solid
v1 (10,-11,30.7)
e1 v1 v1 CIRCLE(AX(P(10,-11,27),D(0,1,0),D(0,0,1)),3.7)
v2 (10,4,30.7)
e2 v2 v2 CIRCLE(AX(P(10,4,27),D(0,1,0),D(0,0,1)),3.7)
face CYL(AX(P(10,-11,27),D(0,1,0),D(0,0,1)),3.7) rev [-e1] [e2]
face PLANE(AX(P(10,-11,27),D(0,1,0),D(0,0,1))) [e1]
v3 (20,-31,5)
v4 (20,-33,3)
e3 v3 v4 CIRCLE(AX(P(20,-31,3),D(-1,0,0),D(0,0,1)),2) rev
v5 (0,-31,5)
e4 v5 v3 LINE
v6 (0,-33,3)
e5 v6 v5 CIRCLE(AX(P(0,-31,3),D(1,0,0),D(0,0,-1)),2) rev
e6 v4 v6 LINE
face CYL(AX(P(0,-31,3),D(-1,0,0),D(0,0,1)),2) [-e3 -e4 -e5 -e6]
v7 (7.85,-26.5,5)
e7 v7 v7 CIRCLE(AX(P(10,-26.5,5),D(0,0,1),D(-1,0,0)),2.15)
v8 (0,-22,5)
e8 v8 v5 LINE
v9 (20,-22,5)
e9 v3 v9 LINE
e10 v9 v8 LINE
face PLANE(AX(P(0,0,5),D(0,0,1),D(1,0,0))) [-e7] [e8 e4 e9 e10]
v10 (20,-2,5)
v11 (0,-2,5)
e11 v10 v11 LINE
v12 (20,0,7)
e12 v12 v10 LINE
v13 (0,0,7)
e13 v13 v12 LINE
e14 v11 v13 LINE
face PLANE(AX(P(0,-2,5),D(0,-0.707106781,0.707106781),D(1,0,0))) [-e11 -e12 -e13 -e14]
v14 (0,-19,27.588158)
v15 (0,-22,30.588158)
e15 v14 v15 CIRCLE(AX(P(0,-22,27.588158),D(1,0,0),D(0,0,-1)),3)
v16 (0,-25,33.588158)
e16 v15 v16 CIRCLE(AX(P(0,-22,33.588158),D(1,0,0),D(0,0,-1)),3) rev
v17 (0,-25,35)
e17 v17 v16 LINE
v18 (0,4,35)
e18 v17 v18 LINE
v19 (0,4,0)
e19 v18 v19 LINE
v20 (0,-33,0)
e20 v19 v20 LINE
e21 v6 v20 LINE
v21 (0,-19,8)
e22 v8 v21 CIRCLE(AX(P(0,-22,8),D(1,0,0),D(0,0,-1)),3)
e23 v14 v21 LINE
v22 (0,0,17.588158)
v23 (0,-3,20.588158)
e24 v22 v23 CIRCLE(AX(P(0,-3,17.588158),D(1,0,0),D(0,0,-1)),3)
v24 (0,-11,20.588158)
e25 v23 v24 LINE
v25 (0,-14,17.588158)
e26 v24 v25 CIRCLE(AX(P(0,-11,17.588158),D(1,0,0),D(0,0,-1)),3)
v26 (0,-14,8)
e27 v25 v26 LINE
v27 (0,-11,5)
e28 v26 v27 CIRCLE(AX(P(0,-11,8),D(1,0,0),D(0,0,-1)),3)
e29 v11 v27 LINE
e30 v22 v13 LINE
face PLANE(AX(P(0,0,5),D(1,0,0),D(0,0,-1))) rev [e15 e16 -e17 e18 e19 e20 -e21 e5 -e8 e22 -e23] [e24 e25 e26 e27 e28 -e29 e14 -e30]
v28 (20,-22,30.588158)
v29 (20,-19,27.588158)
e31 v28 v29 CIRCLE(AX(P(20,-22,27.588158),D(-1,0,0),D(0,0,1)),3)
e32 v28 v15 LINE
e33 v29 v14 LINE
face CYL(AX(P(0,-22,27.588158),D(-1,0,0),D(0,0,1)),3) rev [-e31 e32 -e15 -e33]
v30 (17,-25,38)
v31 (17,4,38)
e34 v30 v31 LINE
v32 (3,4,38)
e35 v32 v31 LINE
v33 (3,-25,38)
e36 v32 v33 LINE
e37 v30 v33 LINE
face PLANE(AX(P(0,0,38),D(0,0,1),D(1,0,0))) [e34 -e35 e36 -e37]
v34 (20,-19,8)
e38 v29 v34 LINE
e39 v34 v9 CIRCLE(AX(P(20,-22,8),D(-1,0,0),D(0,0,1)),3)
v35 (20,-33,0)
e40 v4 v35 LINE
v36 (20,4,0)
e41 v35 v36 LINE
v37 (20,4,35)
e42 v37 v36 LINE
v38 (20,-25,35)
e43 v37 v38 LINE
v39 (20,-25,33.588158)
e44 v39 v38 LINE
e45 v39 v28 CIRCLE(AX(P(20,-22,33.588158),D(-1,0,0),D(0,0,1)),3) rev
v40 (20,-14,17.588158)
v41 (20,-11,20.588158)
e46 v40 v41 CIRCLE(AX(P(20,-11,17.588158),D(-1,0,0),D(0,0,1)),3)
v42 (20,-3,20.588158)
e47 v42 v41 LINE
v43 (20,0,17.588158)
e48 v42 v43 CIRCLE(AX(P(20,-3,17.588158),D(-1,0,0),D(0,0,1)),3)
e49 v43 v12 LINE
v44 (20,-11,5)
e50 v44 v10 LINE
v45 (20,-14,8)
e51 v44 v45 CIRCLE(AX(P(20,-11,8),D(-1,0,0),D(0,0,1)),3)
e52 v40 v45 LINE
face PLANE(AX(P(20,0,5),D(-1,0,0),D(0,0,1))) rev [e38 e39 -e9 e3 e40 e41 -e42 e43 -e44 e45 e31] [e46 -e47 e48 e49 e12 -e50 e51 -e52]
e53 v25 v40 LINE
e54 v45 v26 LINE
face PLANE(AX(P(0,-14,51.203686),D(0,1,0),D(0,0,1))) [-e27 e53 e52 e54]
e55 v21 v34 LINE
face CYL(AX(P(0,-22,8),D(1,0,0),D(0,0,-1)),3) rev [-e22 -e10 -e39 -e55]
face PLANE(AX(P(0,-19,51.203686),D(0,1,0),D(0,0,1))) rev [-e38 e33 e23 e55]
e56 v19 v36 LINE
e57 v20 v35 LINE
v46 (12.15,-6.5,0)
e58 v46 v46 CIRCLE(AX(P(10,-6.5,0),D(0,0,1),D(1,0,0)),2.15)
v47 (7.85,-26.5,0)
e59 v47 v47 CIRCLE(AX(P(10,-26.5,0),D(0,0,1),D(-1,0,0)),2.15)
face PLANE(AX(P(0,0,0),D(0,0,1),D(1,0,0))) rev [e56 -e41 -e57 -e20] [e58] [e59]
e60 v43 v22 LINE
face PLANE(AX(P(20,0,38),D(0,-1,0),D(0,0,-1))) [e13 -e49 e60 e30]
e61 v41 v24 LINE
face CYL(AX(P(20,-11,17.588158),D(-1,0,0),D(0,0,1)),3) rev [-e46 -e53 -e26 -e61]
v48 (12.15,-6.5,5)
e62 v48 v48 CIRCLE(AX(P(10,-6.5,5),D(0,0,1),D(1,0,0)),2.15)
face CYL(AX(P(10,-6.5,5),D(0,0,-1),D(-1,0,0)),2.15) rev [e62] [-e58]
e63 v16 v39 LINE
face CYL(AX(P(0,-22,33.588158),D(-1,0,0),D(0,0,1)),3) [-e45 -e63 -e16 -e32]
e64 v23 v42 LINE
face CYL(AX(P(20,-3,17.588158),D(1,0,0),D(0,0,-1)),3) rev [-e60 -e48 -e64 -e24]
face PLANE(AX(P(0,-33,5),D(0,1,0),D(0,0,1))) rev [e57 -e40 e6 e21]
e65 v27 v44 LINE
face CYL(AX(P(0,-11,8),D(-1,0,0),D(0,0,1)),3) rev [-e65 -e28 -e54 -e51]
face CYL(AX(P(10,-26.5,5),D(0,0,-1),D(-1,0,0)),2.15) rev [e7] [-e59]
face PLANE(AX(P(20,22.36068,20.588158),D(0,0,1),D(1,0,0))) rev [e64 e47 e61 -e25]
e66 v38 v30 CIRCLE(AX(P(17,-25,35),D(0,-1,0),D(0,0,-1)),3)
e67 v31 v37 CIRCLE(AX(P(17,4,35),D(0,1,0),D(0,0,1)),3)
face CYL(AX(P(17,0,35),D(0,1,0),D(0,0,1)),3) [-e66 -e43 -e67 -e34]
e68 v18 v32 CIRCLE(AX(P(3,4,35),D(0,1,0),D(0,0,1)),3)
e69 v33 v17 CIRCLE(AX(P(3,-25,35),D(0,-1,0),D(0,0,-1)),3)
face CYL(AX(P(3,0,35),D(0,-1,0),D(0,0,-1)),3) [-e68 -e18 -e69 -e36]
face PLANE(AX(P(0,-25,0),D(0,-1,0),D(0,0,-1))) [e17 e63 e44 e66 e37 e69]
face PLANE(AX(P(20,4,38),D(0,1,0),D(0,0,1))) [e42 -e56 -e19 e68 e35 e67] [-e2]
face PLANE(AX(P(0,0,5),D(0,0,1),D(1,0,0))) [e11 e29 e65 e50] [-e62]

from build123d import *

# Parameters (mm, degrees)
SKETCH1_W           = 20
SKETCH1_H           = 33
SKETCH1_R           = 2.15
BOSS_EXTRUDE1_DEPTH = 5
SKETCH2_W           = 20
SKETCH2_H           = 4
BOSS_EXTRUDE2_DEPTH = 38
SKETCH4_W           = 20
SKETCH4_H           = 7.411842069
BOSS_EXTRUDE3_DEPTH = 25
FILLET1_R           = 3
FILLET2_R           = 2
FILLET4_R           = 3
CHAMFER2_SIZE       = 2
SKETCH8_W           = 20
SKETCH8_H           = 5
BOSS_EXTRUDE5_DEPTH = 25.588157931
FILLET7_R           = 3
SKETCH12_W          = 20
SKETCH12_H          = 10
BOSS_EXTRUDE6_DEPTH = 14
SKETCH3_R           = 3.7
CUT_EXTRUDE2_DEPTH  = 15
FILLET8_R           = 3


with BuildPart() as part:
    # Sketch1 → Boss-Extrude1 (new body)
    with BuildSketch(Plane.XY):
        with Locations((10, -16.5)):
            Rectangle(SKETCH1_W, SKETCH1_H)
        with Locations((10, -6.5)):
            Circle(SKETCH1_R, mode=Mode.SUBTRACT)
        with Locations(Location((10, -26.5, 0), (0, 0, 180))):
            Circle(SKETCH1_R, mode=Mode.SUBTRACT)
    extrude(amount=BOSS_EXTRUDE1_DEPTH)

    # Sketch2 → Boss-Extrude2 (add)
    with BuildSketch(Plane(origin=(0, 0, 0), x_dir=(-1, 0, 0), z_dir=(0, 0, -1))):
        with Locations((-10, 2)):
            Rectangle(SKETCH2_W, SKETCH2_H)
    extrude(amount=-BOSS_EXTRUDE2_DEPTH)

    # Sketch4 → Boss-Extrude3 (add)
    with BuildSketch(Plane.XZ):
        with Locations((10, 34.294078965)):
            Rectangle(SKETCH4_W, SKETCH4_H)
    extrude(amount=BOSS_EXTRUDE3_DEPTH)

    # Fillet1
    fillet1_edges = [part.edges().sort_by_distance(p)[0] for p in [
        (20, -10.5, 38),
        (0, -10.5, 38),
    ]]
    fillet(fillet1_edges, radius=FILLET1_R)

    # Fillet2
    fillet2_edges = [part.edges().sort_by_distance(p)[0] for p in [
        (10, -33, 5),
    ]]
    fillet(fillet2_edges, radius=FILLET2_R)

    # Fillet4
    fillet4_edges = [part.edges().sort_by_distance(p)[0] for p in [
        (10, -25, 30.588157931),
    ]]
    fillet(fillet4_edges, radius=FILLET4_R)

    # Chamfer2
    chamfer2_edges = [part.edges().sort_by_distance(p)[0] for p in [
        (10, 0, 5),
    ]]
    chamfer(chamfer2_edges, length=CHAMFER2_SIZE)

    # Sketch8 → Boss-Extrude5 (add)
    with BuildSketch(Plane.XY.offset(5)):
        with Locations((10, -16.5)):
            Rectangle(SKETCH8_W, SKETCH8_H)
    extrude(amount=BOSS_EXTRUDE5_DEPTH)

    # Fillet7
    fillet7_edges = [part.edges().sort_by_distance(p)[0] for p in [
        (10, -19, 5),
        (10, -19, 30.588157931),
        (10, -14, 5),
    ]]
    fillet(fillet7_edges, radius=FILLET7_R - 0.0001)  # a hair under: the kernel refuses the full size

    # Sketch12 → Boss-Extrude6 (add)
    with BuildSketch(Plane(origin=(0, -14, 0), x_dir=(1, 0, 0), z_dir=(0, 1, 0))):
        with Locations((10, -25.588157931)):
            Rectangle(SKETCH12_W, SKETCH12_H)
    extrude(amount=BOSS_EXTRUDE6_DEPTH)

    # Sketch3 → Cut-Extrude2 (cut)
    with BuildSketch(Plane(origin=(0, 4, 0), x_dir=(1, 0, 0), z_dir=(0, 1, 0))):
        with Locations(Location((10, -27, 0), (0, 0, 270))):
            Circle(SKETCH3_R)
    extrude(amount=-CUT_EXTRUDE2_DEPTH, mode=Mode.SUBTRACT)

    # Fillet8
    fillet8_edges = [part.edges().sort_by_distance(p)[0] for p in [
        (10, 0, 20.588157931),
        (10, -14, 20.588157931),
    ]]
    fillet(fillet8_edges, radius=FILLET8_R)


solid = part.part
